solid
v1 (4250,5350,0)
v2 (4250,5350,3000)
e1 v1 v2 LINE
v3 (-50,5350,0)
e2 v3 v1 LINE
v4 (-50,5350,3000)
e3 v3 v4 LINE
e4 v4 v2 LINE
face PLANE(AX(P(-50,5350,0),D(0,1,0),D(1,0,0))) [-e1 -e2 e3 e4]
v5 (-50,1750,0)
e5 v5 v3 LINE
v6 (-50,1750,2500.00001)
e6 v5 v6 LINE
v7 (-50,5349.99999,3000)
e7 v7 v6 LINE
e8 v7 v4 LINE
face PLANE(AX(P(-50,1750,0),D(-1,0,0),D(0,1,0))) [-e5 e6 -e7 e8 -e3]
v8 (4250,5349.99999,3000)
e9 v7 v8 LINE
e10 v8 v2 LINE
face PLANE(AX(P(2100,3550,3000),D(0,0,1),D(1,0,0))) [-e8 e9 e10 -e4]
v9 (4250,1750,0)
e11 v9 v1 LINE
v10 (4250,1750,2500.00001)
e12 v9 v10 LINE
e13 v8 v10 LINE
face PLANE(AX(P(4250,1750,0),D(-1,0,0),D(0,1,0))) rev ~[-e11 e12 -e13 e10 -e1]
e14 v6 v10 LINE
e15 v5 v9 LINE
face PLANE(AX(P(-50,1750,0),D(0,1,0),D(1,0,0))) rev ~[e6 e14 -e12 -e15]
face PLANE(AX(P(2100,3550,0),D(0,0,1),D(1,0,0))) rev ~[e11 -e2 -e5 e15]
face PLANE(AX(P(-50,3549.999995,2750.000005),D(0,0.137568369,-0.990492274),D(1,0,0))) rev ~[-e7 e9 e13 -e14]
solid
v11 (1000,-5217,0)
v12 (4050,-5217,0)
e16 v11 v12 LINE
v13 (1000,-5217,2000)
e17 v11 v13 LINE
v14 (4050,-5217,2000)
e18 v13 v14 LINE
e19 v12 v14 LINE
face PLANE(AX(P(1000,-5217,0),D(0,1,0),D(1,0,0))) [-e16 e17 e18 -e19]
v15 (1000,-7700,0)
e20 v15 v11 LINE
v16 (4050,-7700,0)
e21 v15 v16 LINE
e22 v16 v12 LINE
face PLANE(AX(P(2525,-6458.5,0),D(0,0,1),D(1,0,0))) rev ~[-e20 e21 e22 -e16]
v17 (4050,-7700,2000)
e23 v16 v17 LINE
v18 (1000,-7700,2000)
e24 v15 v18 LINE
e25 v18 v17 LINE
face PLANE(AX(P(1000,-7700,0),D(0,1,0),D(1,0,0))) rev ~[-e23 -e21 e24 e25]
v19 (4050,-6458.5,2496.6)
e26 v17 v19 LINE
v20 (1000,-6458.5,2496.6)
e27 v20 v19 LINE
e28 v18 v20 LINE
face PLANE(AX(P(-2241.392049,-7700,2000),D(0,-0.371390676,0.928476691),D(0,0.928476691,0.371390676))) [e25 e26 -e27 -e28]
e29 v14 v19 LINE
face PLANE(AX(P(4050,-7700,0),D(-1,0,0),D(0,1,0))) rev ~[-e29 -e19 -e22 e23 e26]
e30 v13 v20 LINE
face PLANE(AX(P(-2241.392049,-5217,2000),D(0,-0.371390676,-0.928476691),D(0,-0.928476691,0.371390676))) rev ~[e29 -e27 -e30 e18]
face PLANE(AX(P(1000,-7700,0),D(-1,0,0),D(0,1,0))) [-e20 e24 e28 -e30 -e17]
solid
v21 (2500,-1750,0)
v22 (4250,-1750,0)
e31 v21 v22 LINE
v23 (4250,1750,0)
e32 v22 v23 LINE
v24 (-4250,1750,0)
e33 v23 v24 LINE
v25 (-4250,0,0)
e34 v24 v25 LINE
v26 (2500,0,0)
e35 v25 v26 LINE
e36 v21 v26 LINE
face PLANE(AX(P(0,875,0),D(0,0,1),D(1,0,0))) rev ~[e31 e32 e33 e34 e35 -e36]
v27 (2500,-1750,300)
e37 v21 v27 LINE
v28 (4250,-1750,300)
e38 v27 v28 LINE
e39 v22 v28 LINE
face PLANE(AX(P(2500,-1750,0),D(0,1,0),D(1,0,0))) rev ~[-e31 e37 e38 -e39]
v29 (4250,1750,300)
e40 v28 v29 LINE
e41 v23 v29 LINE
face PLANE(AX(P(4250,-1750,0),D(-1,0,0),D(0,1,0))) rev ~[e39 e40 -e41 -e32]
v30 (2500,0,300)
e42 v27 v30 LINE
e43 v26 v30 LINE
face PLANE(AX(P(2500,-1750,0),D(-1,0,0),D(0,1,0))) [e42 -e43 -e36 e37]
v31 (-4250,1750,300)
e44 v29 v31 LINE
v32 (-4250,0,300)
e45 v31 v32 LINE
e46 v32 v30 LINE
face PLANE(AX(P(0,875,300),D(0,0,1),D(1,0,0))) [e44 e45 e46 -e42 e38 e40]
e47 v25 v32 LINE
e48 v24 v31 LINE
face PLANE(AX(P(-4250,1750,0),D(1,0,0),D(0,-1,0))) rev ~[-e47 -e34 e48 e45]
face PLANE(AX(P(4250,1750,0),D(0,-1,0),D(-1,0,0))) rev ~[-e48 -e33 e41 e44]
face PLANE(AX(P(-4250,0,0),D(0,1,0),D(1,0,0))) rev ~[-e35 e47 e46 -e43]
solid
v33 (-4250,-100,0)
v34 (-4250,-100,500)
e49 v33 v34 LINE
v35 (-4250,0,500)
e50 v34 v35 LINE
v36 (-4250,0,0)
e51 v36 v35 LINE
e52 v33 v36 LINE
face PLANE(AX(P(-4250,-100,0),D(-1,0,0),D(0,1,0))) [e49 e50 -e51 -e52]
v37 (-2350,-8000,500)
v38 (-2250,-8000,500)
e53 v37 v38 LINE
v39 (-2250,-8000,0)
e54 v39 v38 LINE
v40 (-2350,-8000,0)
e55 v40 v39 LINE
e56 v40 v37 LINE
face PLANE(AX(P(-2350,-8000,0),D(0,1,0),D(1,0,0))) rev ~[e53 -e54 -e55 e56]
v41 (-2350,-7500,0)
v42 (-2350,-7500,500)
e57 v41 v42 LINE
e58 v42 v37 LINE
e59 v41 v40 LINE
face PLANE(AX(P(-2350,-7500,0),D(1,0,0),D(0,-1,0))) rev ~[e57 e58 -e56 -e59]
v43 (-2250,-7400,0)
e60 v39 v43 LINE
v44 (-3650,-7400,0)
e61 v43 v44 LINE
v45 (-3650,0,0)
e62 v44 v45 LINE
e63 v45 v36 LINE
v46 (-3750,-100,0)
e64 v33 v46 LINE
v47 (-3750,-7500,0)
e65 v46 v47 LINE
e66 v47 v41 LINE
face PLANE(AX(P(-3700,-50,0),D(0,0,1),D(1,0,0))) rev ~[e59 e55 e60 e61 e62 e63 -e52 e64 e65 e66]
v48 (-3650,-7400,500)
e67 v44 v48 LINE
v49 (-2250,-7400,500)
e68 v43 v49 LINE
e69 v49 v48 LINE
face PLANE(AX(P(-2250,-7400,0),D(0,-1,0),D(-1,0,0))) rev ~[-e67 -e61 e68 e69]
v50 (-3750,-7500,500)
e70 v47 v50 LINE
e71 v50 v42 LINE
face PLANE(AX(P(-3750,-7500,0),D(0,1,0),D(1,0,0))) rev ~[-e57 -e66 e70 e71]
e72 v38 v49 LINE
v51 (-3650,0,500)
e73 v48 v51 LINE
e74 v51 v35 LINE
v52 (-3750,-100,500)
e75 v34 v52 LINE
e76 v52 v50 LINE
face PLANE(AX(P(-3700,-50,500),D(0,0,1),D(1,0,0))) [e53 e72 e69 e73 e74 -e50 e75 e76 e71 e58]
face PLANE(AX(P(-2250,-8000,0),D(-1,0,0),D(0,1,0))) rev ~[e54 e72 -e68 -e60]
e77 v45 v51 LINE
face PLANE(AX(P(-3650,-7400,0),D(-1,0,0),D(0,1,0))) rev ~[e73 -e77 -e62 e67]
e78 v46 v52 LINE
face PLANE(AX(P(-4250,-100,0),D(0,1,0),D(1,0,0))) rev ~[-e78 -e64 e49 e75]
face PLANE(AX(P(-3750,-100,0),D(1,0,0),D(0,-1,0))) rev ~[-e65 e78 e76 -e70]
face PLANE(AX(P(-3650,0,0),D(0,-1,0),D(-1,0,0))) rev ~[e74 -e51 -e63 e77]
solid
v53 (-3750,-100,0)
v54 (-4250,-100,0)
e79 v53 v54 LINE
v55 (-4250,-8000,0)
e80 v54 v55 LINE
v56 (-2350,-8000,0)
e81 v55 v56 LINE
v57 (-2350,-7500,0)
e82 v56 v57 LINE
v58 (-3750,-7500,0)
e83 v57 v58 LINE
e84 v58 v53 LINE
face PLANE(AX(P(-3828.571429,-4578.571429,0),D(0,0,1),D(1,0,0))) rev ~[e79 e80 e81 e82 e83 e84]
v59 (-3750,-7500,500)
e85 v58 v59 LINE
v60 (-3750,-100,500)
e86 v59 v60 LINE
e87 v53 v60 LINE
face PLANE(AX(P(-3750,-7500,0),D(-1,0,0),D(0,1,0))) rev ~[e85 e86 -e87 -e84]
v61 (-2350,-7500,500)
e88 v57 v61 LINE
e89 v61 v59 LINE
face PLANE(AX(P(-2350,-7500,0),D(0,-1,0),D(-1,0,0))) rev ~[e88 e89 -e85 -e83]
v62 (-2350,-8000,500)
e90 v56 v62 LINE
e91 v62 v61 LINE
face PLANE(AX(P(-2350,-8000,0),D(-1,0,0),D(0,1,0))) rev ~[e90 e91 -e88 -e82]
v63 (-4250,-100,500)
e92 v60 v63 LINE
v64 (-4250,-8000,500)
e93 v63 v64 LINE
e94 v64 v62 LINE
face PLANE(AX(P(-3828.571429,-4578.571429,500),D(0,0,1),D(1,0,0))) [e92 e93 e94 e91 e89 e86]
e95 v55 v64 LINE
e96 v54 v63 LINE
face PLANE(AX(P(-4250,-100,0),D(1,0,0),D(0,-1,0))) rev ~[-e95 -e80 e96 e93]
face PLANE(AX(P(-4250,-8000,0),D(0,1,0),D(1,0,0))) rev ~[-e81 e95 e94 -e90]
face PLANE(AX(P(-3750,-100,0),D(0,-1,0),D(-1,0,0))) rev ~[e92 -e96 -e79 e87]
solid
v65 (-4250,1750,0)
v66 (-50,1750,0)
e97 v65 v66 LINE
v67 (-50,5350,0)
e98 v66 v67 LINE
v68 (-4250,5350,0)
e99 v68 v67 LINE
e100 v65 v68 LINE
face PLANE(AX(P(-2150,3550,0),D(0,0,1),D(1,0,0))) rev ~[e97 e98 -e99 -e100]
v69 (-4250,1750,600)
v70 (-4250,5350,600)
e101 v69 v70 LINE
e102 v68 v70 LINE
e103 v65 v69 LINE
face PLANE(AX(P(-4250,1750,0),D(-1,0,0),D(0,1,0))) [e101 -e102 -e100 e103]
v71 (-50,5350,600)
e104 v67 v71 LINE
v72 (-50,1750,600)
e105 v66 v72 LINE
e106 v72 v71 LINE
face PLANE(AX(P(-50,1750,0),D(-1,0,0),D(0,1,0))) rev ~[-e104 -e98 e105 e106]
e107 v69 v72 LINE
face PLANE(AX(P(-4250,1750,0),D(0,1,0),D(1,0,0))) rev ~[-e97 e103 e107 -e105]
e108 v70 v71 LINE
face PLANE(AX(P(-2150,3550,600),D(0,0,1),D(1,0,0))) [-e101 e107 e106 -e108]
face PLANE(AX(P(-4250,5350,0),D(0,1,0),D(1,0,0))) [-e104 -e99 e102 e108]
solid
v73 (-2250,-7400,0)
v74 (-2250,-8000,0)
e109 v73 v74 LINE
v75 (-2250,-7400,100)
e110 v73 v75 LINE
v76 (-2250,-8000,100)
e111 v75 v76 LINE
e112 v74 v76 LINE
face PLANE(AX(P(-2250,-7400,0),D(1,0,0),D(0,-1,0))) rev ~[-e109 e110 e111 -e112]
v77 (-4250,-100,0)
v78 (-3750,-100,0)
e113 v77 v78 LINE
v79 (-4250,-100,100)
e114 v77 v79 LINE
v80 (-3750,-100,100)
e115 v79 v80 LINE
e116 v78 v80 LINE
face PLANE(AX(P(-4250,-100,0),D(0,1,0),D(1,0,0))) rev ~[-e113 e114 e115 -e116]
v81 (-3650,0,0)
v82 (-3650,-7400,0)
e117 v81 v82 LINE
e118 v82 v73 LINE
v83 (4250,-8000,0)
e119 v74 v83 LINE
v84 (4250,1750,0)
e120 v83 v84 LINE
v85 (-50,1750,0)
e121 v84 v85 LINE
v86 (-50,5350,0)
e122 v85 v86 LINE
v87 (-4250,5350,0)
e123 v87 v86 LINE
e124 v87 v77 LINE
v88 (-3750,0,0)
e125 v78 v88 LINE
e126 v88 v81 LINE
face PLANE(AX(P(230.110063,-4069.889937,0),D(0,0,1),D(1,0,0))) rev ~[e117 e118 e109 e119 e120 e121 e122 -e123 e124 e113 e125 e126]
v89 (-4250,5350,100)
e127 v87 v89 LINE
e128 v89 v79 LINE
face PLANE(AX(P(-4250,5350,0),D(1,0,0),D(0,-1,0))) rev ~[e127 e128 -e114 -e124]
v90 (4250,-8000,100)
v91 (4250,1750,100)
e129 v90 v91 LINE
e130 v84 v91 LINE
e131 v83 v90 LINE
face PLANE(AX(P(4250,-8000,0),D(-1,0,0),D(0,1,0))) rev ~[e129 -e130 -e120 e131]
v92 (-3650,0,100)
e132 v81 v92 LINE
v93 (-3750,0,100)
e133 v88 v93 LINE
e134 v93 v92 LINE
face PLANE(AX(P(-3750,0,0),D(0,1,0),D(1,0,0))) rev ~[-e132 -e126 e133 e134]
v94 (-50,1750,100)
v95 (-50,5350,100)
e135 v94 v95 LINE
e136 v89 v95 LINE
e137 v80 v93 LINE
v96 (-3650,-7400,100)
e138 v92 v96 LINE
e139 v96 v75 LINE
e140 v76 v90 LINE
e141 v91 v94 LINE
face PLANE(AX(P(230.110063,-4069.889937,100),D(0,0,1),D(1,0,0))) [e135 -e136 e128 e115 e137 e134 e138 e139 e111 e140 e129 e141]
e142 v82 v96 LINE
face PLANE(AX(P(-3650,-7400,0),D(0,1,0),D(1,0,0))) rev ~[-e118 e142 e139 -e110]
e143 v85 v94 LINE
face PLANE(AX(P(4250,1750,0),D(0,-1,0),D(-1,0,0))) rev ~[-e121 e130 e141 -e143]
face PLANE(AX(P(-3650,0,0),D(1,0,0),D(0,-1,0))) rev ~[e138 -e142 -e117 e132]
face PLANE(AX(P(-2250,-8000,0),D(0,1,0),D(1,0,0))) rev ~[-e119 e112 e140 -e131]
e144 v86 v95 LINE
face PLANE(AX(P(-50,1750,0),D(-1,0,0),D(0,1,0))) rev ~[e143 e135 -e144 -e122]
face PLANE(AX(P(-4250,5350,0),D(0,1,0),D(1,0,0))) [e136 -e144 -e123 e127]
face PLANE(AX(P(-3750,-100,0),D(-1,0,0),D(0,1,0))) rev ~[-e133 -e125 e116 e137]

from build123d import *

# Parameters (mm, degrees)
F0_W        = 3050
F0_H        = 2483
F0_W_2      = 500
F0_H_2      = 100
F0_W_3      = 1750
F0_H_3      = 1750
F0_W_4      = 4200
F0_H_4      = 3600
F1_DEPTH    = 100
F2_DEPTH    = 500
F3_DEPTH    = 300
F4_DEPTH    = 600
F5_DEPTH    = 2500
F6_T1_DEPTH = 9532.7840978253
F0_W_5      = 100
F7_DEPTH    = 500
F0_W_6      = 4300
F8_DEPTH    = 3000
F9_SIZE2    = 499.99999
F9_SIZE     = 3599.99999


# Not quite as in the source:
# - a fillet or chamfer that OpenCascade refuses, or shapes differently, is made with other operations: its cross-section is extruded or revolved along the edge and cut away or added
# - a fillet or chamfer is up to 0.001 mm smaller than in the source, because OpenCascade refuses the exact size


with BuildPart() as f1:
    # F0 (on Top) → F1 (new body)
    with BuildSketch(Plane.XY):
        Polygon((2500, -1750), (2500, 0), (-3650, 0), (-3650, -100), (-3650, -7400), (-2250, -7400), (-2250, -8000), (4250, -8000), (4250, -1750), align=None)
        with Locations((2525, -6458.5)):
            Rectangle(F0_W, F0_H, mode=Mode.SUBTRACT)
        with Locations((2525, -6458.5)):
            Rectangle(F0_W, F0_H)
        with Locations((-4000, -50)):
            Rectangle(F0_W_2, F0_H_2)
        with Locations((3375, -875)):
            Rectangle(F0_W_3, F0_H_3)
        Polygon((2500, 0), (4250, 0), (4250, 1750), (-50, 1750), (-4250, 1750), (-4250, 0), (-3750, 0), (-3650, 0), align=None)
        with Locations((-2150, 3550)):
            Rectangle(F0_W_4, F0_H_4)
    extrude(amount=F1_DEPTH)


with BuildPart() as f2:
    # F0 (on Top) → F2 (new body)
    with BuildSketch(Plane.XY):
        Polygon((-3750, -7500), (-3750, -100), (-4250, -100), (-4250, -8000), (-2350, -8000), (-2350, -7500), align=None)
    extrude(amount=F2_DEPTH)


with BuildPart() as f3:
    # F0 (on Top) → F3 (new body)
    with BuildSketch(Plane.XY):
        Polygon((2500, 0), (4250, 0), (4250, 1750), (-50, 1750), (-4250, 1750), (-4250, 0), (-3750, 0), (-3650, 0), align=None)
        with Locations((3375, -875)):
            Rectangle(F0_W_3, F0_H_3)
    extrude(amount=F3_DEPTH)


with BuildPart() as f4:
    # F0 (on Top) → F4 (new body)
    with BuildSketch(Plane.XY):
        with Locations((-2150, 3550)):
            Rectangle(F0_W_4, F0_H_4)
    extrude(amount=F4_DEPTH)


with BuildPart() as f5:
    # F0 (on Top) → F5 (new body)
    with BuildSketch(Plane.XY):
        with Locations((2525, -6458.5)):
            Rectangle(F0_W, F0_H)
    extrude(amount=F5_DEPTH)

    # F6: chamfer of 500 x 1250 on 2 edges, made by hand

    # F6_s2 → F6_t1 (cut)
    with BuildSketch(Plane.YZ.offset(-2241.3920489126)):
        Polygon((-7700, 2000), (-6450, 2500), (-7700, 2500), align=None)
        Polygon((-5217, 2000), (-6467, 2500), (-5217, 2500), align=None)
    extrude(amount=F6_T1_DEPTH, mode=Mode.SUBTRACT)


with BuildPart() as f7:
    # F0 (on Top) → F7 (new body, through all)
    with BuildSketch(Plane.XY):
        with Locations((-3700, -50)):
            Rectangle(F0_W_5, F0_H_2)
        Polygon((-3650, -7400), (-3650, -100), (-3750, -100), (-3750, -7500), (-2350, -7500), (-2350, -8000), (-2250, -8000), (-2250, -7400), align=None)
        with Locations((-4000, -50)):
            Rectangle(F0_W_2, F0_H_2)
    extrude(amount=F7_DEPTH)


with BuildPart() as f8:
    # F0 (on Top) → F8 (new body)
    with BuildSketch(Plane.XY):
        with Locations((2100, 3550)):
            Rectangle(F0_W_6, F0_H_4)
    extrude(amount=F8_DEPTH)

    # F9 (size 3600 and 500 in the source; OpenCascade refuses exactly that, so slightly less here)
    f9_edges = [f8.edges().sort_by_distance(p)[0] for p in [
        (2100, 1750, 3000),
    ]]
    f9_side = f8.faces().sort_by_distance((2100, 3550, 3000))[0]
    chamfer(f9_edges, length=F9_SIZE, length2=F9_SIZE2, reference=f9_side)


solid = Compound([f1.part, f2.part, f3.part, f4.part, f5.part, f7.part, f8.part])
